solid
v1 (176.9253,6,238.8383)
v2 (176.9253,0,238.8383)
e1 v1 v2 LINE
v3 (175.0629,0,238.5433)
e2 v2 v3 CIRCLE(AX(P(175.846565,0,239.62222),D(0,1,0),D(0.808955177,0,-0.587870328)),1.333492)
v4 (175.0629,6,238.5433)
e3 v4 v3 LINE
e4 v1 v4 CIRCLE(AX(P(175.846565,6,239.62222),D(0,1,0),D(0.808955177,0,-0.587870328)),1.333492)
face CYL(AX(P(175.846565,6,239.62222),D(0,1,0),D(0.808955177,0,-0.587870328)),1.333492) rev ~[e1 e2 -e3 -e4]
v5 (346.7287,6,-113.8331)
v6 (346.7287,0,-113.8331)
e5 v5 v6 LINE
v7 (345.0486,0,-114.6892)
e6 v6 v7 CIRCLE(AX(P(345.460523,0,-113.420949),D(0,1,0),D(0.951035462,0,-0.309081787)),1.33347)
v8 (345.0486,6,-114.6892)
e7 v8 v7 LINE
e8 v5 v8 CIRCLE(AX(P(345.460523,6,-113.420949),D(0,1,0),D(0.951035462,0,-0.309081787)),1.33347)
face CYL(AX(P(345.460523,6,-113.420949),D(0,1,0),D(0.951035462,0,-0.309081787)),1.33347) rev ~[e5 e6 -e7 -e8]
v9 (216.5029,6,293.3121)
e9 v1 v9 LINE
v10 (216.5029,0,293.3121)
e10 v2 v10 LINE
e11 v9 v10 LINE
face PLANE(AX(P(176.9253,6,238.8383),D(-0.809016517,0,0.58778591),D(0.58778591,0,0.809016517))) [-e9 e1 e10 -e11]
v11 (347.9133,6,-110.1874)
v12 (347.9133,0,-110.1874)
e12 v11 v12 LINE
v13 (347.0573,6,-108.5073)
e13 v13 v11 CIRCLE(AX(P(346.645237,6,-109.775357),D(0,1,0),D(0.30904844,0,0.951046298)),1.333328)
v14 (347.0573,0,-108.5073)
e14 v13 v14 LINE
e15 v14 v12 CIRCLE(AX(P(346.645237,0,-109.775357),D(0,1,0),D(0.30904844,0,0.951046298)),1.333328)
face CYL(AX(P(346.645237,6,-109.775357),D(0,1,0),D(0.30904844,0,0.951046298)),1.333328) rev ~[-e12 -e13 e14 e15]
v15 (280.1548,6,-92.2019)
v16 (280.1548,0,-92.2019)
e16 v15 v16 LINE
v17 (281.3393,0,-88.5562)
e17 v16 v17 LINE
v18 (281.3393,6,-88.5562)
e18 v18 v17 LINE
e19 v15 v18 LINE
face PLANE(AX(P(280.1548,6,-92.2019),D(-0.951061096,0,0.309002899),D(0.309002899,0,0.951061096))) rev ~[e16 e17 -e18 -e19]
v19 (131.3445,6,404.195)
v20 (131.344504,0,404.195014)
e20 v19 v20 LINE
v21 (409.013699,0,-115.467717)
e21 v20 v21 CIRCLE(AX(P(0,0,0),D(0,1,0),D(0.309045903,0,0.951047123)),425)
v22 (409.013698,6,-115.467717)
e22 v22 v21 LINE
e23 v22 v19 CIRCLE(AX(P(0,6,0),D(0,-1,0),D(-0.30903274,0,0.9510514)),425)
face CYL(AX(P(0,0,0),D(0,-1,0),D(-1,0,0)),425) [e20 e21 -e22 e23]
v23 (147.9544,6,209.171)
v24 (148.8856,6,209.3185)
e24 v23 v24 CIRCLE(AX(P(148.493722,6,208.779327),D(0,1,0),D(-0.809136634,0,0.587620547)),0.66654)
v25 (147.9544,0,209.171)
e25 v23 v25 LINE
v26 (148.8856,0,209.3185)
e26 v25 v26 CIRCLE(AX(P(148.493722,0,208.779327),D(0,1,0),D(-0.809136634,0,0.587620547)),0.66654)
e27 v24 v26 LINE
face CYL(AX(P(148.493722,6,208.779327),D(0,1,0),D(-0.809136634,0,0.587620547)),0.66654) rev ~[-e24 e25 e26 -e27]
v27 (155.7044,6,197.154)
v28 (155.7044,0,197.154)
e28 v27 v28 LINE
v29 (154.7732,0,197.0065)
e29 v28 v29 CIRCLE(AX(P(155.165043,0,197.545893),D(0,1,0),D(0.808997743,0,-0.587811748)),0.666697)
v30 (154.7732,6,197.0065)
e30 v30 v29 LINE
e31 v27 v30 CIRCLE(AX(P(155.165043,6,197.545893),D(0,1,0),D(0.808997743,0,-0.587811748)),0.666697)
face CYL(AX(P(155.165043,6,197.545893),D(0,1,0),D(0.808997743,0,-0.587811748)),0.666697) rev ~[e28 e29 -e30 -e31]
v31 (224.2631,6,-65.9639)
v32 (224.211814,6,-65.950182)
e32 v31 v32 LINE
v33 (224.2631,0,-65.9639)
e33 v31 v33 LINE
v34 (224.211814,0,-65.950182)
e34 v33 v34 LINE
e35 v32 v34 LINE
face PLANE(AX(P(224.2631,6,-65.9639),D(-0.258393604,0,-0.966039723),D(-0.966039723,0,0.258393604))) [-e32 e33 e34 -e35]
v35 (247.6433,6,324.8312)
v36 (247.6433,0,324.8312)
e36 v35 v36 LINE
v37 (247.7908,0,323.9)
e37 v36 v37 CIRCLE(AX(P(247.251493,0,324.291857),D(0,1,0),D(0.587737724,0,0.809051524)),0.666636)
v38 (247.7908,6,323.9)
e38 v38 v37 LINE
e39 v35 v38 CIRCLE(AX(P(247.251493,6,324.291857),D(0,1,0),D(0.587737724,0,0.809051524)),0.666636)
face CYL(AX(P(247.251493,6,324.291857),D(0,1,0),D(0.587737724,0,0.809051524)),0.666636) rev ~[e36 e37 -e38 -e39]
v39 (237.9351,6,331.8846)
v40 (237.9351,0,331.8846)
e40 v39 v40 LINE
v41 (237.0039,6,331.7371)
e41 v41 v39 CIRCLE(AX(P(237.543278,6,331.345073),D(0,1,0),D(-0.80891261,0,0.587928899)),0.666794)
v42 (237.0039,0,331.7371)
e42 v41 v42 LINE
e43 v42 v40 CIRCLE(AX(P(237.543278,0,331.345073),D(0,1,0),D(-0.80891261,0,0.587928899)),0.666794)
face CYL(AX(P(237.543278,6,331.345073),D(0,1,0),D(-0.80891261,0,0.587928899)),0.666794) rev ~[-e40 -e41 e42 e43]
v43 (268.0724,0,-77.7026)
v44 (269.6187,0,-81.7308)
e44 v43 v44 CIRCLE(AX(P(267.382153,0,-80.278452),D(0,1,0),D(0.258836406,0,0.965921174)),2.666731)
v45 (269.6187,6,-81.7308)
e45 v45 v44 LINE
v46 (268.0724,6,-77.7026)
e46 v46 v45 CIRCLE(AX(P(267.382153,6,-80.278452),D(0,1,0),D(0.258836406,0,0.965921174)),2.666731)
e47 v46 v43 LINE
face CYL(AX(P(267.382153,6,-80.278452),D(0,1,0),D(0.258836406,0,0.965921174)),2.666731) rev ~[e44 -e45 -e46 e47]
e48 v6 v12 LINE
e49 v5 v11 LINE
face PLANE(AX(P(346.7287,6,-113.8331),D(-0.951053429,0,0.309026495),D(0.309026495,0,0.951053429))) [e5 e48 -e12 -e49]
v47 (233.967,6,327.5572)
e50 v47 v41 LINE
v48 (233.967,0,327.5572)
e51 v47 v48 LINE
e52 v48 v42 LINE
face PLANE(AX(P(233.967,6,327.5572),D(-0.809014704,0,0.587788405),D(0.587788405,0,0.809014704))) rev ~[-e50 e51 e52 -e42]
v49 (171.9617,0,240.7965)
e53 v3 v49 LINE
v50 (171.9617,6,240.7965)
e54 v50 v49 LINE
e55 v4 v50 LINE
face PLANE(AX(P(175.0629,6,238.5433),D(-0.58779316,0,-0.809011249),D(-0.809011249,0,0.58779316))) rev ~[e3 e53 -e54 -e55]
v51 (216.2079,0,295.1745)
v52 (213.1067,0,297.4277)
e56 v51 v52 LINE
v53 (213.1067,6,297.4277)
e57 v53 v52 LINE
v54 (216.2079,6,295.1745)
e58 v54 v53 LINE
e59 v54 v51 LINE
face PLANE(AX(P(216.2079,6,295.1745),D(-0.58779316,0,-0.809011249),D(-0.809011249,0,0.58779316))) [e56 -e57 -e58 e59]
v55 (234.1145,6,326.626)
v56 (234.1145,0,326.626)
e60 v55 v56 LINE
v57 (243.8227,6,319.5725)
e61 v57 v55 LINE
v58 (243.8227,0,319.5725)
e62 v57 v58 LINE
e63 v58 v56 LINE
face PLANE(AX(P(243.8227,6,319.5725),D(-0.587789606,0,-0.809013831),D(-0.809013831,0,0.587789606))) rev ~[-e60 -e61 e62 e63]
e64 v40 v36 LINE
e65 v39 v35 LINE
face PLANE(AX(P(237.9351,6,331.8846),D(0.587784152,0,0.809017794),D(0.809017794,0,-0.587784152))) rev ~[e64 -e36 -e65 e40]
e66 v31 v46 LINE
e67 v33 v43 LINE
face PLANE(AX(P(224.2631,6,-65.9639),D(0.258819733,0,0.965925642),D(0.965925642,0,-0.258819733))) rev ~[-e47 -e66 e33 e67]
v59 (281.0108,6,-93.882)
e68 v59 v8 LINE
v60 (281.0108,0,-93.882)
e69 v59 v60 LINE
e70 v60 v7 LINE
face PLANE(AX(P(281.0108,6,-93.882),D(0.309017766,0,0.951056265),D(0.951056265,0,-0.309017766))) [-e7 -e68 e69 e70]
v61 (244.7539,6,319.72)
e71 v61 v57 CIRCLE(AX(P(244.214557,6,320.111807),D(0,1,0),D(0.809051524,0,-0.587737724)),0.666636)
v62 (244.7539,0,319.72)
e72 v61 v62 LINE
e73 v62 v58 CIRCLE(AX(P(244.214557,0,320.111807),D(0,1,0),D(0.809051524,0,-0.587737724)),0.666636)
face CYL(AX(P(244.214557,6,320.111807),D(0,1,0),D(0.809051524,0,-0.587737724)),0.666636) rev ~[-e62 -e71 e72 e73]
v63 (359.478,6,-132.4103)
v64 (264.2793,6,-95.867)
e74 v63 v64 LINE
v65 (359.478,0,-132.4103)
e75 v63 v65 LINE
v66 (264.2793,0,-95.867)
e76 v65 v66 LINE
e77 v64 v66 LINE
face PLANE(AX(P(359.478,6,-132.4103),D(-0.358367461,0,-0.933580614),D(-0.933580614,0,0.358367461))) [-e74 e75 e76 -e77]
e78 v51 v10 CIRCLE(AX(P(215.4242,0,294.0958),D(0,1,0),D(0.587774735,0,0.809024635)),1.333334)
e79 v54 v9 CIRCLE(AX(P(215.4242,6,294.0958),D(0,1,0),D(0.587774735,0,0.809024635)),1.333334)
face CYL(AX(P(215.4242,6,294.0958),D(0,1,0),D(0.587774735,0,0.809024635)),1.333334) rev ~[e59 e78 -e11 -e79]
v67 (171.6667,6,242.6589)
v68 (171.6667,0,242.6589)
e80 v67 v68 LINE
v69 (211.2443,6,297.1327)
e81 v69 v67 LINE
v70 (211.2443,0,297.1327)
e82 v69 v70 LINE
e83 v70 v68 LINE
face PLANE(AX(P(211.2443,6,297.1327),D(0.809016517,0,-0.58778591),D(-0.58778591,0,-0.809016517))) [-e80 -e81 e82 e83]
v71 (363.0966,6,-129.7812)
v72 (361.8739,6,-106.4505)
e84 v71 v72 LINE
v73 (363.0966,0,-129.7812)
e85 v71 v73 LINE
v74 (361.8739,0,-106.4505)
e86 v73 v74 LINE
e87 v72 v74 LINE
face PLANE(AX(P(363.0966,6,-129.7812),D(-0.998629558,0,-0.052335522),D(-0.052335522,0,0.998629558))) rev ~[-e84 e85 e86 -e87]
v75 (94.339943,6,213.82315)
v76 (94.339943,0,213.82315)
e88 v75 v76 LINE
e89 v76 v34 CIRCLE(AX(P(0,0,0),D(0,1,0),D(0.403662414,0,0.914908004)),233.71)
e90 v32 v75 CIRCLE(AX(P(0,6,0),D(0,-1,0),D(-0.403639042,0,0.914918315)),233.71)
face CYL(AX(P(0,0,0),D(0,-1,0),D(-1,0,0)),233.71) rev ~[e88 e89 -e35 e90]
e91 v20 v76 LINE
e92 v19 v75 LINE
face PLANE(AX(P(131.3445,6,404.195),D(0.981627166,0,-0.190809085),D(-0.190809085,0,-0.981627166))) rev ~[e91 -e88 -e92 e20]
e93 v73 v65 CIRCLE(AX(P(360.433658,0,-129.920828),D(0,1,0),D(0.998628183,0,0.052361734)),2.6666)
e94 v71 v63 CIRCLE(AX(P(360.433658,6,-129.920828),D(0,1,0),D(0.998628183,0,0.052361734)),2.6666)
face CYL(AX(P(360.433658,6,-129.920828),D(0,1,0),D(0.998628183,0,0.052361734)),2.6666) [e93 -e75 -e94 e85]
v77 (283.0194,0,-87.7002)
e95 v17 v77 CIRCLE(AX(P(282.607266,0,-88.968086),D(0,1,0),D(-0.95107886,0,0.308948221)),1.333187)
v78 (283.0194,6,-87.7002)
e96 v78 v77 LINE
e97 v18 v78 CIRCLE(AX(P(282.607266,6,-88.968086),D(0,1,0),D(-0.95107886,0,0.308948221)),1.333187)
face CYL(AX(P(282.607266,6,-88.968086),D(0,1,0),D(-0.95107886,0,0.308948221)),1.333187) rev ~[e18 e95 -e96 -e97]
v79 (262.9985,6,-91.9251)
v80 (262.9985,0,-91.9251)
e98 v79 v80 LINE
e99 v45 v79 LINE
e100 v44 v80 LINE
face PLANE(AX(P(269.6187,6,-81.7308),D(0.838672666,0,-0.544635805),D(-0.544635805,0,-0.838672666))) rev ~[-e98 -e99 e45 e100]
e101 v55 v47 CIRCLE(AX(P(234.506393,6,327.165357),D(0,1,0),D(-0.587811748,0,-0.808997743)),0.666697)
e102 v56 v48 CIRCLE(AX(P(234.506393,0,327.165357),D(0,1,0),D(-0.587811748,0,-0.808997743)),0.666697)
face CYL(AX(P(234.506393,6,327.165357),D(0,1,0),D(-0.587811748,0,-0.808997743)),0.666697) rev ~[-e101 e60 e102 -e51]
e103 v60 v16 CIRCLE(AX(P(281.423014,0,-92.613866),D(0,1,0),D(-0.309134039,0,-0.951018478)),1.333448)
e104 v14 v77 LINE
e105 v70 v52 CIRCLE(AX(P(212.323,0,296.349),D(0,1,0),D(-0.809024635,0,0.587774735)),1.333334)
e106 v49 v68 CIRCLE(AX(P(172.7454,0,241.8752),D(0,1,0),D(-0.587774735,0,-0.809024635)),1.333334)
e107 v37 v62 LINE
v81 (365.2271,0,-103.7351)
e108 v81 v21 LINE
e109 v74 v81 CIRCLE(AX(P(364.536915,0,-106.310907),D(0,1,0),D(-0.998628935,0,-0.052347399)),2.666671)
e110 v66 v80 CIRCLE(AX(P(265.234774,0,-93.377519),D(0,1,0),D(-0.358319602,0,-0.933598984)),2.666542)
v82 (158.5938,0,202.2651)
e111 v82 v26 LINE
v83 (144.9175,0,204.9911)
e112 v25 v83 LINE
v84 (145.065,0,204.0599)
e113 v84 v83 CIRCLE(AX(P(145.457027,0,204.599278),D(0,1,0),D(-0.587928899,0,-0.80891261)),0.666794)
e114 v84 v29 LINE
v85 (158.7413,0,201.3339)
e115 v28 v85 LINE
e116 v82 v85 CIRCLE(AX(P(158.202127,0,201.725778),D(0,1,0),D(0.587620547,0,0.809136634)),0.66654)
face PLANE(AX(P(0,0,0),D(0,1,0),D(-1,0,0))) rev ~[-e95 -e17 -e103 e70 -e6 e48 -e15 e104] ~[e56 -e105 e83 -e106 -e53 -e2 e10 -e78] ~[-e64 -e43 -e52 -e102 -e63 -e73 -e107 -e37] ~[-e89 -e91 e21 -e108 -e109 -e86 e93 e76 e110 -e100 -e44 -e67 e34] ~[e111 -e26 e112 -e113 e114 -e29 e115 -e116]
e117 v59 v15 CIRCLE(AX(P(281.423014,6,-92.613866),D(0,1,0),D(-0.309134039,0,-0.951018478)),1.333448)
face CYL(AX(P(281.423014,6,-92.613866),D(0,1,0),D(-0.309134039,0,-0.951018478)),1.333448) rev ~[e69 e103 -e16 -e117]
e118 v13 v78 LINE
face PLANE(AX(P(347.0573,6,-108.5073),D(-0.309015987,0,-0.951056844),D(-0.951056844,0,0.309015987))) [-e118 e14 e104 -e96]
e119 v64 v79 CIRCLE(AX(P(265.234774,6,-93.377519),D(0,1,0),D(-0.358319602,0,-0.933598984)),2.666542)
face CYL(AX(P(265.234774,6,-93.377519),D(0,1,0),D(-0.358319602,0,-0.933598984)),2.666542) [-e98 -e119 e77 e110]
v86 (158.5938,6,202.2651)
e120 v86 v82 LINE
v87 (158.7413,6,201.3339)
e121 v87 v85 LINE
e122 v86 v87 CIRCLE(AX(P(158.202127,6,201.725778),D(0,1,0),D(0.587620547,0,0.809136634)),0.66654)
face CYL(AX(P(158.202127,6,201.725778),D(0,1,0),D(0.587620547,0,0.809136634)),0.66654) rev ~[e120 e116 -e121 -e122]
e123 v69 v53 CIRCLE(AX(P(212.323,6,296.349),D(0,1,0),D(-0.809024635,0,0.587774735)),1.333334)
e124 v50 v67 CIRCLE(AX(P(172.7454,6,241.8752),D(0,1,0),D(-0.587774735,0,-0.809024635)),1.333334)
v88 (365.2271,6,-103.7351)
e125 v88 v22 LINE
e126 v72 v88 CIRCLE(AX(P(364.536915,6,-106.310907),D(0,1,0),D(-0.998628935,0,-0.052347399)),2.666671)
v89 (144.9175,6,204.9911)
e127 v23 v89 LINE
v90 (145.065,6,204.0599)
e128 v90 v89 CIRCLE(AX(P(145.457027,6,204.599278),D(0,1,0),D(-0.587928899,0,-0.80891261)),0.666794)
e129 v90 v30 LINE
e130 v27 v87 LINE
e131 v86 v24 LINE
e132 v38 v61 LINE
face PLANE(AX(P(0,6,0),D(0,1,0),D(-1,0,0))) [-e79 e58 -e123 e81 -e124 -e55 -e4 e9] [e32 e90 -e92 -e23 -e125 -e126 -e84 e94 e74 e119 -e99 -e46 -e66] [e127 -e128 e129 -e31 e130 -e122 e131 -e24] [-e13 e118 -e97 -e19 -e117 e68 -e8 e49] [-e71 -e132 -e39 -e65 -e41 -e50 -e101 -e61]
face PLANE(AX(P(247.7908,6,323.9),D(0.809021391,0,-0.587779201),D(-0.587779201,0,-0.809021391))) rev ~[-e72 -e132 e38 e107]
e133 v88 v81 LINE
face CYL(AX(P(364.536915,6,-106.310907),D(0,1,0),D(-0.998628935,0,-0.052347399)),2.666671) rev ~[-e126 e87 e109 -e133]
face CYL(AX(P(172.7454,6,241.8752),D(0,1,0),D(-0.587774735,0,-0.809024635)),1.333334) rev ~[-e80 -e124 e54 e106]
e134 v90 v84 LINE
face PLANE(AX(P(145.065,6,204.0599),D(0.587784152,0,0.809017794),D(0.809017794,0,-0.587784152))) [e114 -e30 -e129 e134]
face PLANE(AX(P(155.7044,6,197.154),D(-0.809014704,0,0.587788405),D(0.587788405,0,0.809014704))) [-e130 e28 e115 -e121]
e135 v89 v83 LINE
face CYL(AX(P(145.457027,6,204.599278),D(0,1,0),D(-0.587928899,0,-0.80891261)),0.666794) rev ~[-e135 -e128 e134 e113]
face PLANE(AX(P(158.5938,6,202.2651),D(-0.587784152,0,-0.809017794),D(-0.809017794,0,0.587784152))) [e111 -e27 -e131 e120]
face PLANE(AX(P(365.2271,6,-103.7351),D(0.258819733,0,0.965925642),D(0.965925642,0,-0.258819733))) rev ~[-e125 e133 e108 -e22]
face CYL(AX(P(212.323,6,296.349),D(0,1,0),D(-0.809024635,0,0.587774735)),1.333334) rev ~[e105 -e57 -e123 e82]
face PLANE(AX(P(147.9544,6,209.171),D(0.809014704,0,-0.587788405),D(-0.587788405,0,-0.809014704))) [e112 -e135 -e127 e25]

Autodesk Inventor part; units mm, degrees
ref_plane "YZ Plane" through (0, 0, 0) normal (1, 0, 0) x (0, 1, 0)
ref_plane "XZ Plane" through (0, 0, 0) normal (0, 1, 0) x (-1, 0, 0)
ref_plane "XY Plane" through (0, 0, 0) normal (0, 0, 1) x (1, 0, 0)
sketch "Sketch1" plane through (0, 0, 0) normal (0, 1, 0) x (-1, 0, 0)
  circle A0 centre (0, 0) radius 425
  circle A1 centre (0, 0) radius 233.71
  dimension "d84" = 467.42
  dimension "d85" = 850
extrude "Extrusion3" add sketch "Sketch1" along normal blind 6
sketch "Sketch2" plane through (0, 6, 0) normal (0, 1, 0) x (1, 0, 0)
  circle A0 centre (0, 0) radius 329.355 construction
  line L0 (3.25, 363.0217) -> (3.25, 295.6883)
  line L1 (-3.25, 295.6883) -> (-3.25, 363.0217)
  arc A1 (-3.25, 295.6883) -> (-1.9167, 294.355) centre (-1.9167, 295.6883) ccw
  arc A2 (1.9167, 294.355) -> (3.25, 295.6883) centre (1.9167, 295.6883) ccw
  arc A3 (-1.9167, 364.355) -> (-3.25, 363.0217) centre (-1.9167, 363.0217) ccw
  arc A4 (3.25, 363.0217) -> (1.9167, 364.355) centre (1.9167, 363.0217) ccw
  line L2 (-1.9167, 364.355) -> (1.9167, 364.355)
  line L3 (-1.9167, 294.355) -> (1.9167, 294.355)
  line L4 (0, 294.355) -> (0, 329.355) construction
  line L5 (0, 364.355) -> (0, 329.355) construction
  line L6 (0, 364.355) -> (0, 294.355) construction
  line L7 (175.0629, -238.5433) -> (171.9617, -240.7965)
  arc A5 (176.9253, -238.8383) -> (175.0629, -238.5433) centre (175.8467, -239.622) ccw
  arc A6 (171.9617, -240.7965) -> (171.6667, -242.6589) centre (172.7454, -241.8752) ccw
  line L8 (173.0175, -238.1382) -> (193.59, -266.4538) construction
  line L9 (211.2443, -297.1327) -> (171.6667, -242.6589)
  line L10 (176.9253, -238.8383) -> (216.5029, -293.3121)
  line L11 (214.1625, -294.7694) -> (173.0175, -238.1382) construction
  line L12 (214.1625, -294.7694) -> (193.59, -266.4538) construction
  arc A7 (211.2443, -297.1327) -> (213.1067, -297.4277) centre (212.323, -296.349) ccw
  line L13 (216.2079, -295.1745) -> (213.1067, -297.4277)
  arc A8 (216.2079, -295.1745) -> (216.5029, -293.3121) centre (215.4242, -294.0958) ccw
  line L14 (280.1548, 92.2019) -> (281.3393, 88.5562)
  arc A9 (281.0108, 93.882) -> (280.1548, 92.2019) centre (281.4229, 92.614) ccw
  arc A10 (281.3393, 88.5562) -> (283.0194, 87.7002) centre (282.6074, 88.9682) ccw
  line L15 (279.9482, 90.9607) -> (313.2352, 101.7763) construction
  line L16 (347.0573, 108.5073) -> (283.0194, 87.7002)
  line L17 (281.0108, 93.882) -> (345.0486, 114.6892)
  line L18 (346.5222, 112.5919) -> (279.9482, 90.9607) construction
  line L19 (346.5222, 112.5919) -> (313.2352, 101.7763) construction
  arc A11 (347.0573, 108.5073) -> (347.9133, 110.1874) centre (346.6452, 109.7754) ccw
  line L20 (346.7287, 113.8331) -> (347.9133, 110.1874)
  arc A12 (346.7287, 113.8331) -> (345.0486, 114.6892) centre (345.4607, 113.4211) ccw
  dimension "d86" = 658.71
  dimension "d21" = 6.5
  dimension "d24" = 2.6667
  dimension "d25" = 2.6667
  dimension "d32" = 1.3333
  dimension "d33" = 1.3333
  dimension "d162" = 70
  dimension "d163" = 294.355
  dimension "d165" = 3.25
extrude "Extrusion4" cut sketch "Sketch2" against normal through all
sketch "Sketch3" plane through (0, 6, 0) normal (0, 1, 0) x (1, 0, 0)
  arc A0 (-131.3389, -404.1968) -> (131.3445, -404.195) centre (0, 0) ccw
  arc A1 (-77.7244, -128.3741) -> (77.7297, -128.3709) centre (0, 0) ccw
  line L0 (-122.1811, -173.696) -> (-161.3589, -227.6196)
  line L1 (-131.3389, -404.1968) -> (-77.7244, -128.3741)
  line L2 (0, 0) -> (0, -341.2918)
  line L3 (131.3445, -404.195) -> (77.7297, -128.3709)
  line L4 (210.5535, -295.3313) -> (171.3679, -241.3969) projected
  dimension "d52" = 25
  dimension "d87" = 150.07
  dimension "d88" = 425
  dimension "d89" = 25
  dimension "d90" = 11
  dimension "d91" = 11
sketch "Sketch5" plane through (0, 6, 0) normal (0, 1, 0) x (1, 0, 0)
  line L0 (3.25, 363.0217) -> (3.25, 295.6883) projected
  line L1 (5.5862, 281.6788) -> (-6.155, 278.5328)
  line L2 (-11.2263, 385.43) -> (10.5847, 377.0575)
  line L3 (6.5657, 233.6709) -> (8.9394, 278.9635)
  line L4 (14.2034, 379.4075) -> (16.5771, 424.7001)
  arc A0 (10.5847, 377.0575) -> (14.2034, 379.4075) centre (11.5404, 379.5471) ccw
  arc A1 (8.9394, 278.9635) -> (5.5862, 281.6788) centre (6.2763, 279.103) ccw
  arc A2 (-11.2263, 385.43) -> (-14.8449, 382.8009) centre (-12.1819, 382.9405) ccw
  line L5 (-3.25, 295.6883) -> (-3.25, 363.0217) projected
  line L6 (-14.8449, 382.8009) -> (-9.5081, 280.969)
  arc A3 (-9.5081, 280.969) -> (-6.155, 278.5328) centre (-6.8451, 281.1086) ccw
  line L7 (-1.9167, 294.355) -> (1.9167, 294.355) projected
  line L8 (1.9167, 364.355) -> (-1.9167, 364.355) projected
  line L9 (16.5771, 424.7001) -> (16.5774, 424.7058)
  line L10 (6.5657, 233.6709) -> (6.5621, 233.6028)
  circle A4 centre (0, 0) radius 425
  circle A5 centre (0, 0) radius 233.71
  line L11 (-356.4489, 130.7516) -> (-398.7912, 147.0053)
  arc A6 (-355.3322, 126.5839) -> (-356.4489, 130.7516) centre (-357.4046, 128.2621) ccw
  line L12 (-370.0348, 108.4276) -> (-355.3322, 126.5839)
  arc A7 (-370.0348, 108.4276) -> (-368.6526, 104.1736) centre (-367.9624, 106.7494) ccw
  line L13 (-368.6526, 104.1736) -> (-270.1556, 77.7814)
  arc A8 (-270.1556, 77.7814) -> (-266.8024, 80.2177) centre (-269.4654, 80.3572) ccw
  line L14 (-266.1663, 92.3563) -> (-266.8024, 80.2177)
  arc A9 (-262.5476, 94.7063) -> (-266.1663, 92.3563) centre (-263.5032, 92.2167) ccw
  line L15 (-220.2053, 78.4526) -> (-262.5476, 94.7063)
  line L16 (-220.2053, 78.4526) -> (-220.1417, 78.4282)
  line L17 (-398.7912, 147.0053) -> (-398.7965, 147.0073)
  line L18 (-142.66, -185.1845) -> (-142.6172, -185.1316)
  line L19 (-263.0436, -333.8458) -> (-263.0472, -333.8502)
  line L20 (132.0366, -192.9029) -> (131.9995, -192.8458)
  line L21 (236.2213, -353.3334) -> (236.2244, -353.3381)
  line L22 (365.2271, 103.7351) -> (409.0364, 115.4738)
  arc A10 (361.8739, 106.4505) -> (365.2271, 103.7351) centre (364.5369, 106.3109) ccw
  line L23 (363.0966, 129.7812) -> (361.8739, 106.4505)
  arc A11 (363.0966, 129.7812) -> (359.478, 132.4103) centre (360.4336, 129.9208) ccw
  line L24 (359.478, 132.4103) -> (264.2793, 95.867)
  arc A12 (264.2793, 95.867) -> (262.9985, 91.9251) centre (265.2349, 93.3774) ccw
  line L25 (269.6187, 81.7308) -> (262.9985, 91.9251)
  arc A13 (268.0724, 77.7026) -> (269.6187, 81.7308) centre (267.3822, 80.2784) ccw
  line L26 (224.2631, 65.9639) -> (268.0724, 77.7026)
  line L27 (224.2631, 65.9639) -> (224.1973, 65.9463)
  line L28 (409.0364, 115.4738) -> (409.0419, 115.4753)
  line L29 (0, -233.71) -> (0, -425)
  arc A14 (131.3445, -404.195) -> (-131.3389, -404.1968) centre (0, 0) ccw projected
  point P0 (-425, 0)
  point P1 (-425, 0)
  point P2 (-398.7693, 146.9969)
  point P3 (-220.1557, 78.4336)
  point P4 (16.5759, 424.6766)
  point P5 (6.5629, 233.6178)
  point P6 (409.0137, 115.4677)
  point P7 (224.2118, 65.9502)
  dimension "d63" = 2.6667
  dimension "d64" = 3
  dimension "d66" = 3
  dimension "d67" = 2.6667
  dimension "d68" = 2.6667
  dimension "d70" = 72
  dimension "d71" = 72
sketch "Sketch6" plane through (0, 6, 0) normal (0, 1, 0) x (1, 0, 0)
  line L0 (237.9351, -331.8846) -> (247.6433, -324.8312)
  line L1 (243.8227, -319.5725) -> (234.1145, -326.626)
  line L2 (210.5535, -295.3313) -> (171.3679, -241.3969) projected
  line L3 (215.5172, -293.3731) -> (212.416, -295.6263) projected
  arc A0 (244.7539, -319.72) -> (243.8227, -319.5725) centre (244.2145, -320.1119) ccw
  arc A1 (247.6433, -324.8312) -> (247.7908, -323.9) centre (247.2514, -324.2918) ccw
  arc A2 (237.0039, -331.7371) -> (237.9351, -331.8846) centre (237.5432, -331.3452) ccw
  arc A3 (234.1145, -326.626) -> (233.967, -327.5572) centre (234.5063, -327.1653) ccw
  line L4 (233.967, -327.5572) -> (237.0039, -331.7371)
  line L5 (247.7908, -323.9) -> (244.7539, -319.72)
  line L6 (171.3679, -241.3969) -> (210.5535, -295.3313) projected
  line L7 (190.9607, -268.3641) -> (196.2193, -264.5435)
  line L8 (215.8122, -291.5107) -> (176.6265, -237.5763) projected
  line L9 (145.065, -204.0599) -> (154.7732, -197.0065)
  line L10 (158.5938, -202.2651) -> (148.8856, -209.3185)
  arc A4 (158.5938, -202.2651) -> (158.7413, -201.3339) centre (158.202, -201.7257) ccw
  arc A5 (155.7044, -197.154) -> (154.7732, -197.0065) centre (155.1651, -197.5458) ccw
  arc A6 (145.065, -204.0599) -> (144.9175, -204.9911) centre (145.4569, -204.5992) ccw
  arc A7 (147.9544, -209.171) -> (148.8856, -209.3185) centre (148.4938, -208.7792) ccw
  line L11 (147.9544, -209.171) -> (144.9175, -204.9911)
  line L12 (155.7044, -197.154) -> (158.7413, -201.3339)
  point P0 (0, 0)
  dimension "d104" = 6.5
  dimension "d105" = 12
  dimension "d108" = 1.3333
  dimension "d109" = 1.3333
  dimension "d110" = 1.3333
  dimension "d111" = 1.3333
  dimension "d112" = 0
  dimension "d149" = 145
  dimension "d150" = 90
  dimension "d151" = 90
  dimension "d152" = 90
  dimension "d153" = 90
extrude "Extrusion7" cut sketch "Sketch6" against normal through all
pattern_circular "Circular Pattern2" count 2 over 72 about axis through (0, -10, 0) along (0, 1, 0) of "Extrusion7"
pattern_circular "Circular Pattern3" count 2 over 144 about axis through (0, -10, 0) along (0, 1, 0) of "Extrusion7"
mirror "Mirror3" about plane through (0, 0, 0) normal (1, 0, 0) of "Extrusion7"
extrude "Extrusion10" cut sketch "Sketch3" against normal blind 10
mirror "Mirror4" about plane through (0, 0, 0) normal (1, 0, 0) of "Extrusion4"
pattern_circular "Circular Pattern4" count 2 over 144 about axis through (0, -10, 0) along (0, -1, 0) of "Extrusion7"
extrude "Extrusion11" cut sketch "Sketch5" against normal through all contours A1 L3 L10 A5 L16 L15 A9 L14 A8 L13 A7 L12 A6 L11 A4 L4 A0 L2 A2 L6 A3 L1 | L1 A3 L6 A2 L2 A0 L4 A4 L22 A10 L23 A11 L24 A12 L25 A13 L26 L27 A5 L10 L3 A1 | A5 L29 A4 L11 A6 L12 A7 L13 A8 L14 A9 L15 L16
equation "\"BendRadius\" = Thickness"
equation "\"BendReliefWidth\" = Thickness"
equation "\"BendReliefDepth\" = 0.5 * Thickness"
equation "\"CornerReliefSize\" = 4 * Thickness"
equation "\"MinimumRemnant\" = 2 * Thickness"
equation "\"TransitionRadius\" = BendRadius"
equation "\"JacobiRadiusSize\" = BendRadius"
equation "\"GapSize\" = Thickness"
equation "\"Thickness\" = 0.5"
properties part number "Ring C4" material "Wood (Maple)"
